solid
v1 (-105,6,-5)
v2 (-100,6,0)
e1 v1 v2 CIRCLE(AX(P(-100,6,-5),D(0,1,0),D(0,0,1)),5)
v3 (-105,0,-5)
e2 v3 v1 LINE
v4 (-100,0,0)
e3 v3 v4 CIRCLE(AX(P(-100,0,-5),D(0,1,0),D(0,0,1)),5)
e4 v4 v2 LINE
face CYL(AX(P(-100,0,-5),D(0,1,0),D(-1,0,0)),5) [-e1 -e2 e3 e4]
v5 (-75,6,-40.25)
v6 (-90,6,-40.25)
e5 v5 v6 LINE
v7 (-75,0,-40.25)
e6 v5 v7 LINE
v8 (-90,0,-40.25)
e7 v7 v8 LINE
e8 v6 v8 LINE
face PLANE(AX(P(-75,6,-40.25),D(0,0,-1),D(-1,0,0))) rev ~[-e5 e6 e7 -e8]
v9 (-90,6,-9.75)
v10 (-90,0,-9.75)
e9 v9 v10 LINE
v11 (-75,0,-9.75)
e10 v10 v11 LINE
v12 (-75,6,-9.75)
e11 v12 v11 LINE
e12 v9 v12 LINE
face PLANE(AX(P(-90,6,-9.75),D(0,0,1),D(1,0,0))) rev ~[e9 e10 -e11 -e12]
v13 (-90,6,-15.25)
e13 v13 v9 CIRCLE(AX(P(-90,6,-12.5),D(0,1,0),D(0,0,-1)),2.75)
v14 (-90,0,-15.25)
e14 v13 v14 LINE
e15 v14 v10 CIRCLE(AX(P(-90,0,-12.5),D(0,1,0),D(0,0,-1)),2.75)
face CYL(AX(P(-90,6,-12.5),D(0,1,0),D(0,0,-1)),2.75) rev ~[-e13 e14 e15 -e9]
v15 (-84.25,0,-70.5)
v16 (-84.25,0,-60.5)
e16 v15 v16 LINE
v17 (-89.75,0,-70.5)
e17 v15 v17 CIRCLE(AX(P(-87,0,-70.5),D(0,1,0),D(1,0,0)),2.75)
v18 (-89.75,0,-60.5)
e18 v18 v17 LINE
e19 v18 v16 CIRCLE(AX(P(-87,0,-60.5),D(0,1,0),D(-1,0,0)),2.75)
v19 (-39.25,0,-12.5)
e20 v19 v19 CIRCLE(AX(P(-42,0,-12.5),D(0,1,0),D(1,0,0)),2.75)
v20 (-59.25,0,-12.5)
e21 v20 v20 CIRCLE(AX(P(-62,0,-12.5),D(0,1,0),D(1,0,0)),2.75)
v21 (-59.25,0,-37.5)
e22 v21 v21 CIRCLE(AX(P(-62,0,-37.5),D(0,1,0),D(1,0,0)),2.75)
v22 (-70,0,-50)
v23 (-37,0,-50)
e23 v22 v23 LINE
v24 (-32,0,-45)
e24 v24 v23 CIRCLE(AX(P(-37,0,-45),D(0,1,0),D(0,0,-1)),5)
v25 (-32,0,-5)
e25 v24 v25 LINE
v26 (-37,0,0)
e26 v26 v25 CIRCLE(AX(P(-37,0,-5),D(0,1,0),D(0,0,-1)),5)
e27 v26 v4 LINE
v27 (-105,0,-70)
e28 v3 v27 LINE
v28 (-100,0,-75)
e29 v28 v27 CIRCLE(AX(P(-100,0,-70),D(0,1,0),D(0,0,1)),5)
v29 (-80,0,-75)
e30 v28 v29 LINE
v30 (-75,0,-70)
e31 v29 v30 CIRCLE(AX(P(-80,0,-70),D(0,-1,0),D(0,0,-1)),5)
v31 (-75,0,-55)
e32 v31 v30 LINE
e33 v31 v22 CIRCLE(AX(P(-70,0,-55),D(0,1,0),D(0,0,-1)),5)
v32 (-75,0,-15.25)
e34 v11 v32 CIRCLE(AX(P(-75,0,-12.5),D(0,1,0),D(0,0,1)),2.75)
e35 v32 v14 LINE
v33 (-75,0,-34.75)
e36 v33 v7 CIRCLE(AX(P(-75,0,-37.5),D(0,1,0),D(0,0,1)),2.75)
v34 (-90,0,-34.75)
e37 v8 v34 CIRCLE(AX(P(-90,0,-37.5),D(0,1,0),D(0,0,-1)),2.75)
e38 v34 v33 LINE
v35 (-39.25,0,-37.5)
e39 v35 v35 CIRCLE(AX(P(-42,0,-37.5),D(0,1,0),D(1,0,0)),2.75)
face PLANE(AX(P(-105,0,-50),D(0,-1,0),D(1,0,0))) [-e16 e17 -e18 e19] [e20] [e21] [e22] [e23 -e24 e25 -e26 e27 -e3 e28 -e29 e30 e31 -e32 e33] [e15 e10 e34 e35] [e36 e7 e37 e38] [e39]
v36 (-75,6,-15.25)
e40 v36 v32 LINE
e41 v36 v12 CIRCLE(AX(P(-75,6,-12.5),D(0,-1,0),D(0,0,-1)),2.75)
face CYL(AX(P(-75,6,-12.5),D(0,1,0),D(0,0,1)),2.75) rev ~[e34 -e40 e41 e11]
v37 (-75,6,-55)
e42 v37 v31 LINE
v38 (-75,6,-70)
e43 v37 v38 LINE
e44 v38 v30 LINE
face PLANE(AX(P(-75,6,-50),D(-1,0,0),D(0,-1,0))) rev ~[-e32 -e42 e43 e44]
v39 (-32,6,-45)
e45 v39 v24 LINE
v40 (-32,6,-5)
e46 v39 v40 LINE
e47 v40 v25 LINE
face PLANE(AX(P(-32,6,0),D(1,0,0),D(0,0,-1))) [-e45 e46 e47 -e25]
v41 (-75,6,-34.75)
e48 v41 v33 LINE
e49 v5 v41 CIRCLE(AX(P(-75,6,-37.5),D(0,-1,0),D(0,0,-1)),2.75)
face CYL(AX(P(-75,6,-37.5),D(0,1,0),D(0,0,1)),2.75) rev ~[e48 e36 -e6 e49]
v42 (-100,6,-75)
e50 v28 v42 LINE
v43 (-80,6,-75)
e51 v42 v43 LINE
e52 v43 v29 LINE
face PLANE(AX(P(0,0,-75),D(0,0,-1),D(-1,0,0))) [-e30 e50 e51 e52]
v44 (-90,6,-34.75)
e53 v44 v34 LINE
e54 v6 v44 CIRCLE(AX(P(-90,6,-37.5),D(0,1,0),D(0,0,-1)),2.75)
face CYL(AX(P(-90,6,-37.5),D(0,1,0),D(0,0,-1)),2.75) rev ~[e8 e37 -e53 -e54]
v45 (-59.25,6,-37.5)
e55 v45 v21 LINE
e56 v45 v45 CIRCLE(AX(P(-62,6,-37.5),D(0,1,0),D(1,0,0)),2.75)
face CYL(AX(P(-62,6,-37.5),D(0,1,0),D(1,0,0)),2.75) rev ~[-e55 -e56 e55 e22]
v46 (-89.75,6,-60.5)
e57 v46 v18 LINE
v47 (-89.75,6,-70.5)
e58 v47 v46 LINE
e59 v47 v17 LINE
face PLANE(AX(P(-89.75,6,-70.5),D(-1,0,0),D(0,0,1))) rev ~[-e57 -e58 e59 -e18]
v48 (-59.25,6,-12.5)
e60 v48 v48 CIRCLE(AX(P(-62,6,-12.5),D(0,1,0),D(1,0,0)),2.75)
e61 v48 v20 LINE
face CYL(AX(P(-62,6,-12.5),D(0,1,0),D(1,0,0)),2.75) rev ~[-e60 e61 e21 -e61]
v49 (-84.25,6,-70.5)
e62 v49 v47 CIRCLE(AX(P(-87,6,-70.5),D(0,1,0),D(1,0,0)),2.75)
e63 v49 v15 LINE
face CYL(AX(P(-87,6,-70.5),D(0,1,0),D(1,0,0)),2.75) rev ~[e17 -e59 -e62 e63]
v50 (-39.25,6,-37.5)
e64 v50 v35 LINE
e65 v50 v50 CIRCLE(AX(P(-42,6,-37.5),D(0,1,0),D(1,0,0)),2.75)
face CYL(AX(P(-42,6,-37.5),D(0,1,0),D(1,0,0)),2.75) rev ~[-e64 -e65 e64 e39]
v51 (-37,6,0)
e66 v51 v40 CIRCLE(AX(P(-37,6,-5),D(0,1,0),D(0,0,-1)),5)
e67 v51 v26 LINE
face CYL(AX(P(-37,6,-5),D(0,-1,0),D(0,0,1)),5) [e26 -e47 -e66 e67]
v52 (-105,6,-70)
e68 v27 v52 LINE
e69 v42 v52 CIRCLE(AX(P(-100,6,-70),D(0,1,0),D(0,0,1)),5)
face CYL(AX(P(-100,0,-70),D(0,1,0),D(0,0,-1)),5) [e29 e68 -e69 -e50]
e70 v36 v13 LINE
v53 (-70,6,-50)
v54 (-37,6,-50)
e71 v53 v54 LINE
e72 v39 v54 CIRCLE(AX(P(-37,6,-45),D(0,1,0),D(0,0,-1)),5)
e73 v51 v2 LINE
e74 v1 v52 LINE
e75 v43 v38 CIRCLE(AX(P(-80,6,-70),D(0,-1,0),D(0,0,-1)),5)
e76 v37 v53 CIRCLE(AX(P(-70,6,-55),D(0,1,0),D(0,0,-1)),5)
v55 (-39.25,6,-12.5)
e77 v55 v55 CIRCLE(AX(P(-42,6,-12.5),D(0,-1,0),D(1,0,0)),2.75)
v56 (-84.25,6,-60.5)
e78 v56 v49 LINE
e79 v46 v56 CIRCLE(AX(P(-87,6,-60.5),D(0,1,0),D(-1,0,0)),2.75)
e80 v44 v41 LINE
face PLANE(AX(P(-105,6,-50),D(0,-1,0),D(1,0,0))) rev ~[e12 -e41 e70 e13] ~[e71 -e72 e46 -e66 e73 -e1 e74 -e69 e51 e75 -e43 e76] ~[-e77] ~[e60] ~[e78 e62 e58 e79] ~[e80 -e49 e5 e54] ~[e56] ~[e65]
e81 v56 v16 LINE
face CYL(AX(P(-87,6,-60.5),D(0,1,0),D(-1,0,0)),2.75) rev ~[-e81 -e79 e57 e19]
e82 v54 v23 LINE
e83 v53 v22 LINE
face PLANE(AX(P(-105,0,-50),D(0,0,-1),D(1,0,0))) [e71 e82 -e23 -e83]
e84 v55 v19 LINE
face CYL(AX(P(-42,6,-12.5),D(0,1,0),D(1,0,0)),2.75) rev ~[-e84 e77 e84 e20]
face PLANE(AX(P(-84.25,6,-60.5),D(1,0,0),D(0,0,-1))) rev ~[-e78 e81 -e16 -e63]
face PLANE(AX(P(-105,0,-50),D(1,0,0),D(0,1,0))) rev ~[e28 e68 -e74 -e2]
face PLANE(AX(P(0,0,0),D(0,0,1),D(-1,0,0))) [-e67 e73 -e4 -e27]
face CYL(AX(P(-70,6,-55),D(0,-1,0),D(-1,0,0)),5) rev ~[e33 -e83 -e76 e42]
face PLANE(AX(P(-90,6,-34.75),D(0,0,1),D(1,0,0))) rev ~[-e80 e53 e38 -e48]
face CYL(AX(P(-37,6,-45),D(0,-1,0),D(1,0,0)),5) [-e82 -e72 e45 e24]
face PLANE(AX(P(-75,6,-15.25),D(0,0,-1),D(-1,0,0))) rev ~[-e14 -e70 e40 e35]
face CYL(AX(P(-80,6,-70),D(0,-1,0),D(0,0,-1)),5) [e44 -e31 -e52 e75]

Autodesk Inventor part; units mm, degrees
ref_plane "YZ Plane" through (0, 0, 0) normal (1, 0, 0) x (0, 1, 0)
ref_plane "XZ Plane" through (0, 0, 0) normal (0, 1, 0) x (-1, 0, 0)
ref_plane "XY Plane" through (0, 0, 0) normal (0, 0, 1) x (1, 0, 0)
sketch "Sketch1" plane through (0, 0, 0) normal (0, 1, 0) x (-1, 0, 0)
  line L0 (0, 0) -> (105, 0)
  line L1 (105, 0) -> (105, -50)
  line L2 (105, -50) -> (0, -50)
  line L3 (0, -50) -> (0, 0)
  line L4 (0, 0) -> (0, -16.6667)
  line L5 (0, -16.6667) -> (11, -16.6667)
  dimension "d0" = 105
  dimension "d1" = 50
  dimension "d2" = 16.6667
  dimension "d3" = 11
extrude "Extrusion1" add sketch "Sketch1" along normal blind 6
sketch "Sketch3" plane through (0, 6, 0) normal (0, 1, 0) x (1, 0, 0)
  circle A0 centre (-20, 12.5) radius 2.75
  line L0 (0, 0) -> (0, 50) projected
  line L1 (-105, 0) -> (0, 0) projected
  circle A1 centre (-20, 37.5) radius 2.75
  dimension "d21" = 5.5
  dimension "d22" = 20
  dimension "d23" = 12.5
  dimension "d26" = 25
extrude "Extrusion3" cut sketch "Sketch3" against normal through all
sketch "Sketch4" plane through (0, 6, 0) normal (0, 1, 0) x (1, 0, 0)
  circle A0 centre (-20, 12.5) radius 2.75 projected
  line L0 (-20, 12.5) -> (-75, 12.5)
  line L1 (-75, 12.5) -> (-90, 12.5) construction
  line L2 (-75, 15.25) -> (-90, 15.25)
  line L3 (-90, 9.75) -> (-75, 9.75)
  arc A1 (-75, 9.75) -> (-75, 15.25) centre (-75, 12.5) ccw
  arc A2 (-90, 15.25) -> (-90, 9.75) centre (-90, 12.5) ccw
  point P0 (0, 0)
  point P1 (-82.5, 12.5)
  dimension "d33" = 55
  dimension "d34" = 15
  dimension "d35" = 5.5
extrude "Extrusion4" cut sketch "Sketch4" against normal through all contours A1 L3 A2 L2
pattern_linear "Rectangular Pattern2" count 2 spacing 25 along (0, 0, -1) of "Extrusion4"
sketch "Sketch5" plane through (0, 0, -50) normal (0, 0, -1) x (-1, 0, 0)
  line L0 (105, 0) -> (105, 6) projected
  line L1 (105, 0) -> (0, 0) projected
  line L2 (105, 6) -> (75, 6)
  line L3 (75, 6) -> (75, 0)
  line L4 (75, 0) -> (105, 0)
  line L5 (105, 0) -> (105, 6)
  dimension "d45" = 30
extrude "Extrusion5" add sketch "Sketch5" along normal blind 25
sketch "Sketch6" plane through (0, 6, 0) normal (0, 1, 0) x (1, 0, 0)
  line L0 (-87, 60.5) -> (-87, 70.5) construction
  line L1 (-84.25, 60.5) -> (-84.25, 70.5)
  line L2 (-89.75, 70.5) -> (-89.75, 60.5)
  arc A0 (-89.75, 60.5) -> (-84.25, 60.5) centre (-87, 60.5) ccw
  arc A1 (-84.25, 70.5) -> (-89.75, 70.5) centre (-87, 70.5) ccw
  line L3 (-75, 50) -> (-75, 75) projected
  arc A2 (-90, 40.25) -> (-90, 34.75) centre (-90, 37.5) ccw projected
  point P0 (0, 0)
  point P1 (-87, 65.5)
  dimension "d48" = 10
  dimension "d49" = 5.5
  dimension "d50" = 12
  dimension "d51" = 28
extrude "Extrusion6" cut sketch "Sketch6" against normal through all
fillet "Fillet2" radius 5 6 edges at (-105, 3, 0) (0, 3, 0) (-75, 3, -75) (-105, 3, -75) (0, 3, -50) (-75, 3, -50)
sketch "Sketch7" plane through (0, 6, 0) normal (0, 1, 0) x (1, 0, 0)
  circle A0 centre (-20, 12.5) radius 2.75 projected
  line L0 (-20, 12.5) -> (-42, 12.5)
  line L1 (-42, 12.5) -> (-62, 12.5)
  circle A1 centre (-62, 12.5) radius 2.75
  circle A2 centre (-42, 12.5) radius 2.75
  line L2 (0, 5) -> (0, 45) projected
  line L3 (0, 0) -> (0, 45)
  circle A3 centre (-42, 37.5) radius 2.75
  circle A4 centre (-62, 37.5) radius 2.75
  dimension "d55" = 22
  dimension "d56" = 20
  dimension "d57" = 5.5
  dimension "d58" = 5.5
  dimension "d61" = 25
extrude "Extrusion7" cut sketch "Sketch7" against normal through all contours A2 L1 L0 | L0 L1 A2 | A1 | A3 | A4
sketch "Sketch9" plane through (0, 6, 0) normal (0, 1, 0) x (1, 0, 0)
  point P0 (0, 0)
sketch "Sketch12" plane through (0, 6, 0) normal (0, 1, 0) x (1, 0, 0)
  circle A0 centre (-42, 37.5) radius 2.75 projected
  line L0 (-42, 37.5) -> (-32, 37.5)
  line L1 (-32, 37.5) -> (-32, 50)
  line L2 (-5, 50) -> (-70, 50) projected
  line L3 (-32, 50) -> (0, 50)
  line L4 (0, 50) -> (0, 0)
  line L5 (0, 0) -> (-32, 0)
  line L6 (-32, 0) -> (-32, 50)
  dimension "d87" = 10
extrude "Extrusion10" cut sketch "Sketch12" against normal blind 10 contours L1 L2 L3 L4 L5 L6
fillet "Fillet3" radius 5 2 edges at (-32, 3, 0) (-32, 3, -50)
properties part number "X_Carriage_Plate_Short"
